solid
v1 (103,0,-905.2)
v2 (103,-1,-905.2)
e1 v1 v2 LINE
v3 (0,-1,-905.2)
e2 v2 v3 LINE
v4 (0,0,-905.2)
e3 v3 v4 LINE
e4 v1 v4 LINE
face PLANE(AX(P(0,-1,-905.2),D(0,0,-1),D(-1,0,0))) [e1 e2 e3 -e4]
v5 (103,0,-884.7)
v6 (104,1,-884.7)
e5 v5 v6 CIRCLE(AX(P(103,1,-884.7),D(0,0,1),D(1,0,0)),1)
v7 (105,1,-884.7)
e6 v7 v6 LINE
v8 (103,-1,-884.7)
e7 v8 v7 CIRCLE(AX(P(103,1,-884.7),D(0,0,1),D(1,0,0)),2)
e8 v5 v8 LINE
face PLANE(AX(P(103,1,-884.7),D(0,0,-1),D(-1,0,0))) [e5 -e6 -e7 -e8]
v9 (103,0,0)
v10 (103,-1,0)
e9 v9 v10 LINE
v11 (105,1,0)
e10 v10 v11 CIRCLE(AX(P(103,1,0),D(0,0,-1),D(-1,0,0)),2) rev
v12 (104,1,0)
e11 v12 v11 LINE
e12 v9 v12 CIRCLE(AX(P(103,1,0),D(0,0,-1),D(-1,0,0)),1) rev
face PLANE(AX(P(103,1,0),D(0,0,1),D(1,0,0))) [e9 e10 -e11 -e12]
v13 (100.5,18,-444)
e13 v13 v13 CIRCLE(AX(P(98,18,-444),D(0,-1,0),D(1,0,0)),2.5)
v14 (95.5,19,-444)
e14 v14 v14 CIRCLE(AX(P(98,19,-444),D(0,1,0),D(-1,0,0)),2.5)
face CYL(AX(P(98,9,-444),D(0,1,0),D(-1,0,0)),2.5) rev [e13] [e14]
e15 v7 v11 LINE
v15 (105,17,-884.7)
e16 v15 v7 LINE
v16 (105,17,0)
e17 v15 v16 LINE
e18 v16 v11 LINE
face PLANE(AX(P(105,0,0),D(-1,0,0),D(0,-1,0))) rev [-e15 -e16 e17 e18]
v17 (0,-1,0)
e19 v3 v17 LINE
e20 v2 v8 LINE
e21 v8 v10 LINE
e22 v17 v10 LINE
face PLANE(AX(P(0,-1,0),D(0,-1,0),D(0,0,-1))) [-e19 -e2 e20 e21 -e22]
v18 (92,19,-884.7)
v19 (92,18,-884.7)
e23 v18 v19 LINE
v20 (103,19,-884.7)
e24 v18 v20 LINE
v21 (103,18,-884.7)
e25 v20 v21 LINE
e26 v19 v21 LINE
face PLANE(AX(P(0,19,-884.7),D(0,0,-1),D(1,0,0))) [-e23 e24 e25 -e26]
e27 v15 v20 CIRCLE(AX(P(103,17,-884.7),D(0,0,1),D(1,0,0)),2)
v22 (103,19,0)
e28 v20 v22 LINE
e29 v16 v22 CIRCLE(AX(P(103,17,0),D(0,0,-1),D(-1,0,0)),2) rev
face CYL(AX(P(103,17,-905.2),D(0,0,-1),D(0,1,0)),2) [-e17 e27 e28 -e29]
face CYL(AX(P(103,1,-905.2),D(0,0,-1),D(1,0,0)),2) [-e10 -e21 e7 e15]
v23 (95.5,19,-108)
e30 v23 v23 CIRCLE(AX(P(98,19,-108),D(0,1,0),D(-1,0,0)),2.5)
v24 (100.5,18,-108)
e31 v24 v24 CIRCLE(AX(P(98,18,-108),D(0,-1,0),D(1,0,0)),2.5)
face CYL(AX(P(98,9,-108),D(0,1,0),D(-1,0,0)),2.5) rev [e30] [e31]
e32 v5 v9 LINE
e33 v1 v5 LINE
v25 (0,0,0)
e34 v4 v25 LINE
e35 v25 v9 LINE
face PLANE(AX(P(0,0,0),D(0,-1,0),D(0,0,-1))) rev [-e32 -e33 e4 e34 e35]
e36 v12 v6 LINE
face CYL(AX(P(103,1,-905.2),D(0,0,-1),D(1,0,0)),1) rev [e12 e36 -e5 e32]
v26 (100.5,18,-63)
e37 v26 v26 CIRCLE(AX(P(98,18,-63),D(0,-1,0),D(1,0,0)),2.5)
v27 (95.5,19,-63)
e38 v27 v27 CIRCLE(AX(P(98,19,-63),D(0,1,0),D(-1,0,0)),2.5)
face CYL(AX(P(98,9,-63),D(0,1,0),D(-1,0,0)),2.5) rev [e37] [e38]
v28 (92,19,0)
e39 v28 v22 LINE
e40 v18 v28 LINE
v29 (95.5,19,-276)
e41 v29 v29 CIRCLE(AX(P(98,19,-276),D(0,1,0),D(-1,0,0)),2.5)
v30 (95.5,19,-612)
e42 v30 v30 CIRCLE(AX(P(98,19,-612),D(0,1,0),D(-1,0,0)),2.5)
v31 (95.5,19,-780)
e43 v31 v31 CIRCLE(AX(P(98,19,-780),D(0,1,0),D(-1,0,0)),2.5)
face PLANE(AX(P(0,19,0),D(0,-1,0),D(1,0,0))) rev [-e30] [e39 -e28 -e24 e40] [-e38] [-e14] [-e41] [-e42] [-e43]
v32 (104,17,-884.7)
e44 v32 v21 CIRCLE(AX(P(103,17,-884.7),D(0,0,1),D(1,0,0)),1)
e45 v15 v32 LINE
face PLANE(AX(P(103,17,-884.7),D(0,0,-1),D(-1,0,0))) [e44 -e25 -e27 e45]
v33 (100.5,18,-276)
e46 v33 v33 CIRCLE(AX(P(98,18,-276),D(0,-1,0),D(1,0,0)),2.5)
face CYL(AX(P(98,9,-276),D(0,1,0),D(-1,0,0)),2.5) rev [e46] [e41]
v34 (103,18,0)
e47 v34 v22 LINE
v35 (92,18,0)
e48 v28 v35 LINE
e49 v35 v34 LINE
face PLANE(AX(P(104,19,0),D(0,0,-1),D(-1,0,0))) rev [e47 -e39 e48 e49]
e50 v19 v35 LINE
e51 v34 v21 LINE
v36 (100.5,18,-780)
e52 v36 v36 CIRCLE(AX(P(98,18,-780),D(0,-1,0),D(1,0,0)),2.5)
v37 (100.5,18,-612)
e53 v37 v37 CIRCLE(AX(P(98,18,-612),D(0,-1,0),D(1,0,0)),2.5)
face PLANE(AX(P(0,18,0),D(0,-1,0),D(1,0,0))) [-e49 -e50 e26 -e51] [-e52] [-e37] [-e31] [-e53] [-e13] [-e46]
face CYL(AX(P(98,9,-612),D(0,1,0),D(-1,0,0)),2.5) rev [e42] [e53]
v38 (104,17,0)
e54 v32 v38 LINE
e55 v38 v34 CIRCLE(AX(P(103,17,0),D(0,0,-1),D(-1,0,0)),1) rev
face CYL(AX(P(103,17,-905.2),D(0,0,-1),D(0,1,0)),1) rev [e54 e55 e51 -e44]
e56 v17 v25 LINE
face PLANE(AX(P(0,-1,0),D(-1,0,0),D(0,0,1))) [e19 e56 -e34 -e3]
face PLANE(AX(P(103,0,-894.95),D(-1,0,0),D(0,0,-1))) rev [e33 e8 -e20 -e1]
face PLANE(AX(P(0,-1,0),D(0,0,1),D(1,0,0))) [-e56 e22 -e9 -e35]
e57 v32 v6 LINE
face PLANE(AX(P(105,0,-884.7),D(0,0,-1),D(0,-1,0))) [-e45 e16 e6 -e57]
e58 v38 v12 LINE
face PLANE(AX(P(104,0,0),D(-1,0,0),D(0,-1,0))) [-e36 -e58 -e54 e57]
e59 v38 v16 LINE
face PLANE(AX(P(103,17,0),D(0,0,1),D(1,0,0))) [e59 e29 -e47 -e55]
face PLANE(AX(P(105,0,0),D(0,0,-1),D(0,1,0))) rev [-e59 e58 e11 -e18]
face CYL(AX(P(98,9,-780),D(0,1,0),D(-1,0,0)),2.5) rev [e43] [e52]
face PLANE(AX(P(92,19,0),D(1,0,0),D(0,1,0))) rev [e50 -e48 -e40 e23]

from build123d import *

# Parameters (mm, degrees)
SKETCH1_W                    = 105
SKETCH1_H                    = 905.2
BASE_FLANGE1_DEPTH           = 1
EDGE_FLANGE1_STRIP_W         = 6
EDGE_FLANGE1_STRIP_H         = 1
EDGE_FLANGE1_STRIP_CUT_DEPTH = 905.2
EDGE_FLANGE1_DEPTH           = 905.2
EDGE_FLANGE2_STRIP_W         = 6
EDGE_FLANGE2_STRIP_H         = 1
EDGE_FLANGE2_STRIP_CUT_DEPTH = 905.2
EDGE_FLANGE2_DEPTH           = 905.2
SKETCH19_R                   = 2.5
CUT_EXTRUDE2_DEPTH           = 10
CUT_EXTRUDE3_START           = -905.2
CUT_EXTRUDE3_DEPTH           = 20.5


# Read off the part's stored shape, not the designer's step: Cut-Extrude3
# Sheet-metal steps are written as plain solids
with BuildPart() as part:
    # Sketch1 → Base-Flange1 (new body)
    with BuildSketch(Plane(origin=(0, 0, 0), x_dir=(1, 0, 0), z_dir=(0, 1, 0))):
        with Locations((52.5, 452.6)):
            Rectangle(SKETCH1_W, SKETCH1_H)
    extrude(amount=-BASE_FLANGE1_DEPTH)

    # Edge-Flange1 strip (across the edge) → Edge-Flange1 strip cut (cut)
    with BuildSketch(Plane(origin=(105, 0, 0), x_dir=(-1, 0, 0), z_dir=(0, 0, -1))):
        with Locations((-1, -0.5)):
            Rectangle(EDGE_FLANGE1_STRIP_W, EDGE_FLANGE1_STRIP_H)
    extrude(amount=EDGE_FLANGE1_STRIP_CUT_DEPTH, mode=Mode.SUBTRACT)

    # Edge-Flange1 section (across the edge) → Edge-Flange1 (add)
    with BuildSketch(Plane(origin=(105, 0, 0), x_dir=(-1, 0, 0), z_dir=(0, 0, -1))):
        with BuildLine():
            Line((0, 1), (0, 19))
            Line((0, 19), (1, 19))
            Line((1, 19), (1, 1))
            ThreePointArc((1, 1), (1.292893219, 0.292893219), (2, 0))
            Line((2, 0), (2, -1))
            ThreePointArc((2, -1), (0.585786438, -0.414213562), (0, 1))
        make_face()
    extrude(amount=EDGE_FLANGE1_DEPTH)

    # Edge-Flange2 strip (across the edge) → Edge-Flange2 strip cut (cut)
    with BuildSketch(Plane(origin=(104, 19, 0), x_dir=(0, -1, 0), z_dir=(0, 0, -1))):
        with Locations((-1, -0.5)):
            Rectangle(EDGE_FLANGE2_STRIP_W, EDGE_FLANGE2_STRIP_H)
    extrude(amount=EDGE_FLANGE2_STRIP_CUT_DEPTH, mode=Mode.SUBTRACT)

    # Edge-Flange2 section (across the edge) → Edge-Flange2 (add)
    with BuildSketch(Plane(origin=(104, 19, 0), x_dir=(0, -1, 0), z_dir=(0, 0, -1))):
        with BuildLine():
            Line((0, 1), (0, 12))
            Line((0, 12), (1, 12))
            Line((1, 12), (1, 1))
            ThreePointArc((1, 1), (1.292893219, 0.292893219), (2, 0))
            Line((2, 0), (2, -1))
            ThreePointArc((2, -1), (0.585786438, -0.414213562), (0, 1))
        make_face()
    extrude(amount=EDGE_FLANGE2_DEPTH)

    # Sketch19 → Cut-Extrude2 (cut)
    with BuildSketch(Plane(origin=(0, 19, 0), x_dir=(1, 0, 0), z_dir=(0, 1, 0))):
        with Locations(Location((98, 63, 0), (0, 0, 180))):
            Circle(SKETCH19_R)
        with Locations(Location((98, 108, 0), (0, 0, 180))):
            Circle(SKETCH19_R)
        with Locations(Location((98, 276, 0), (0, 0, 180))):
            Circle(SKETCH19_R)
        with Locations(Location((98, 444, 0), (0, 0, 180))):
            Circle(SKETCH19_R)
        with Locations(Location((98, 612, 0), (0, 0, 180))):
            Circle(SKETCH19_R)
        with Locations(Location((98, 780, 0), (0, 0, 180))):
            Circle(SKETCH19_R)
    extrude(amount=-CUT_EXTRUDE2_DEPTH, mode=Mode.SUBTRACT)

    # Cut-Extrude3 outline → Cut-Extrude3 (cut)
    with BuildSketch(Plane.XY.offset(CUT_EXTRUDE3_START)):
        with BuildLine():
            ThreePointArc((104, 1), (103.707106781, 0.292893219), (103, 0))
            Line((103, 0), (103, -1))
            ThreePointArc((103, -1), (104.414213562, -0.414213562), (105, 1))
            Line((105, 1), (105, 17))
            ThreePointArc((105, 17), (104.414213562, 18.414213562), (103, 19))
            Line((103, 19), (92, 19))
            Line((92, 19), (92, 18))
            Line((92, 18), (103, 18))
            ThreePointArc((103, 18), (103.707106781, 17.707106781), (104, 17))
            Line((104, 17), (104, 1))
        make_face()
    extrude(amount=CUT_EXTRUDE3_DEPTH, mode=Mode.SUBTRACT)


solid = part.part
